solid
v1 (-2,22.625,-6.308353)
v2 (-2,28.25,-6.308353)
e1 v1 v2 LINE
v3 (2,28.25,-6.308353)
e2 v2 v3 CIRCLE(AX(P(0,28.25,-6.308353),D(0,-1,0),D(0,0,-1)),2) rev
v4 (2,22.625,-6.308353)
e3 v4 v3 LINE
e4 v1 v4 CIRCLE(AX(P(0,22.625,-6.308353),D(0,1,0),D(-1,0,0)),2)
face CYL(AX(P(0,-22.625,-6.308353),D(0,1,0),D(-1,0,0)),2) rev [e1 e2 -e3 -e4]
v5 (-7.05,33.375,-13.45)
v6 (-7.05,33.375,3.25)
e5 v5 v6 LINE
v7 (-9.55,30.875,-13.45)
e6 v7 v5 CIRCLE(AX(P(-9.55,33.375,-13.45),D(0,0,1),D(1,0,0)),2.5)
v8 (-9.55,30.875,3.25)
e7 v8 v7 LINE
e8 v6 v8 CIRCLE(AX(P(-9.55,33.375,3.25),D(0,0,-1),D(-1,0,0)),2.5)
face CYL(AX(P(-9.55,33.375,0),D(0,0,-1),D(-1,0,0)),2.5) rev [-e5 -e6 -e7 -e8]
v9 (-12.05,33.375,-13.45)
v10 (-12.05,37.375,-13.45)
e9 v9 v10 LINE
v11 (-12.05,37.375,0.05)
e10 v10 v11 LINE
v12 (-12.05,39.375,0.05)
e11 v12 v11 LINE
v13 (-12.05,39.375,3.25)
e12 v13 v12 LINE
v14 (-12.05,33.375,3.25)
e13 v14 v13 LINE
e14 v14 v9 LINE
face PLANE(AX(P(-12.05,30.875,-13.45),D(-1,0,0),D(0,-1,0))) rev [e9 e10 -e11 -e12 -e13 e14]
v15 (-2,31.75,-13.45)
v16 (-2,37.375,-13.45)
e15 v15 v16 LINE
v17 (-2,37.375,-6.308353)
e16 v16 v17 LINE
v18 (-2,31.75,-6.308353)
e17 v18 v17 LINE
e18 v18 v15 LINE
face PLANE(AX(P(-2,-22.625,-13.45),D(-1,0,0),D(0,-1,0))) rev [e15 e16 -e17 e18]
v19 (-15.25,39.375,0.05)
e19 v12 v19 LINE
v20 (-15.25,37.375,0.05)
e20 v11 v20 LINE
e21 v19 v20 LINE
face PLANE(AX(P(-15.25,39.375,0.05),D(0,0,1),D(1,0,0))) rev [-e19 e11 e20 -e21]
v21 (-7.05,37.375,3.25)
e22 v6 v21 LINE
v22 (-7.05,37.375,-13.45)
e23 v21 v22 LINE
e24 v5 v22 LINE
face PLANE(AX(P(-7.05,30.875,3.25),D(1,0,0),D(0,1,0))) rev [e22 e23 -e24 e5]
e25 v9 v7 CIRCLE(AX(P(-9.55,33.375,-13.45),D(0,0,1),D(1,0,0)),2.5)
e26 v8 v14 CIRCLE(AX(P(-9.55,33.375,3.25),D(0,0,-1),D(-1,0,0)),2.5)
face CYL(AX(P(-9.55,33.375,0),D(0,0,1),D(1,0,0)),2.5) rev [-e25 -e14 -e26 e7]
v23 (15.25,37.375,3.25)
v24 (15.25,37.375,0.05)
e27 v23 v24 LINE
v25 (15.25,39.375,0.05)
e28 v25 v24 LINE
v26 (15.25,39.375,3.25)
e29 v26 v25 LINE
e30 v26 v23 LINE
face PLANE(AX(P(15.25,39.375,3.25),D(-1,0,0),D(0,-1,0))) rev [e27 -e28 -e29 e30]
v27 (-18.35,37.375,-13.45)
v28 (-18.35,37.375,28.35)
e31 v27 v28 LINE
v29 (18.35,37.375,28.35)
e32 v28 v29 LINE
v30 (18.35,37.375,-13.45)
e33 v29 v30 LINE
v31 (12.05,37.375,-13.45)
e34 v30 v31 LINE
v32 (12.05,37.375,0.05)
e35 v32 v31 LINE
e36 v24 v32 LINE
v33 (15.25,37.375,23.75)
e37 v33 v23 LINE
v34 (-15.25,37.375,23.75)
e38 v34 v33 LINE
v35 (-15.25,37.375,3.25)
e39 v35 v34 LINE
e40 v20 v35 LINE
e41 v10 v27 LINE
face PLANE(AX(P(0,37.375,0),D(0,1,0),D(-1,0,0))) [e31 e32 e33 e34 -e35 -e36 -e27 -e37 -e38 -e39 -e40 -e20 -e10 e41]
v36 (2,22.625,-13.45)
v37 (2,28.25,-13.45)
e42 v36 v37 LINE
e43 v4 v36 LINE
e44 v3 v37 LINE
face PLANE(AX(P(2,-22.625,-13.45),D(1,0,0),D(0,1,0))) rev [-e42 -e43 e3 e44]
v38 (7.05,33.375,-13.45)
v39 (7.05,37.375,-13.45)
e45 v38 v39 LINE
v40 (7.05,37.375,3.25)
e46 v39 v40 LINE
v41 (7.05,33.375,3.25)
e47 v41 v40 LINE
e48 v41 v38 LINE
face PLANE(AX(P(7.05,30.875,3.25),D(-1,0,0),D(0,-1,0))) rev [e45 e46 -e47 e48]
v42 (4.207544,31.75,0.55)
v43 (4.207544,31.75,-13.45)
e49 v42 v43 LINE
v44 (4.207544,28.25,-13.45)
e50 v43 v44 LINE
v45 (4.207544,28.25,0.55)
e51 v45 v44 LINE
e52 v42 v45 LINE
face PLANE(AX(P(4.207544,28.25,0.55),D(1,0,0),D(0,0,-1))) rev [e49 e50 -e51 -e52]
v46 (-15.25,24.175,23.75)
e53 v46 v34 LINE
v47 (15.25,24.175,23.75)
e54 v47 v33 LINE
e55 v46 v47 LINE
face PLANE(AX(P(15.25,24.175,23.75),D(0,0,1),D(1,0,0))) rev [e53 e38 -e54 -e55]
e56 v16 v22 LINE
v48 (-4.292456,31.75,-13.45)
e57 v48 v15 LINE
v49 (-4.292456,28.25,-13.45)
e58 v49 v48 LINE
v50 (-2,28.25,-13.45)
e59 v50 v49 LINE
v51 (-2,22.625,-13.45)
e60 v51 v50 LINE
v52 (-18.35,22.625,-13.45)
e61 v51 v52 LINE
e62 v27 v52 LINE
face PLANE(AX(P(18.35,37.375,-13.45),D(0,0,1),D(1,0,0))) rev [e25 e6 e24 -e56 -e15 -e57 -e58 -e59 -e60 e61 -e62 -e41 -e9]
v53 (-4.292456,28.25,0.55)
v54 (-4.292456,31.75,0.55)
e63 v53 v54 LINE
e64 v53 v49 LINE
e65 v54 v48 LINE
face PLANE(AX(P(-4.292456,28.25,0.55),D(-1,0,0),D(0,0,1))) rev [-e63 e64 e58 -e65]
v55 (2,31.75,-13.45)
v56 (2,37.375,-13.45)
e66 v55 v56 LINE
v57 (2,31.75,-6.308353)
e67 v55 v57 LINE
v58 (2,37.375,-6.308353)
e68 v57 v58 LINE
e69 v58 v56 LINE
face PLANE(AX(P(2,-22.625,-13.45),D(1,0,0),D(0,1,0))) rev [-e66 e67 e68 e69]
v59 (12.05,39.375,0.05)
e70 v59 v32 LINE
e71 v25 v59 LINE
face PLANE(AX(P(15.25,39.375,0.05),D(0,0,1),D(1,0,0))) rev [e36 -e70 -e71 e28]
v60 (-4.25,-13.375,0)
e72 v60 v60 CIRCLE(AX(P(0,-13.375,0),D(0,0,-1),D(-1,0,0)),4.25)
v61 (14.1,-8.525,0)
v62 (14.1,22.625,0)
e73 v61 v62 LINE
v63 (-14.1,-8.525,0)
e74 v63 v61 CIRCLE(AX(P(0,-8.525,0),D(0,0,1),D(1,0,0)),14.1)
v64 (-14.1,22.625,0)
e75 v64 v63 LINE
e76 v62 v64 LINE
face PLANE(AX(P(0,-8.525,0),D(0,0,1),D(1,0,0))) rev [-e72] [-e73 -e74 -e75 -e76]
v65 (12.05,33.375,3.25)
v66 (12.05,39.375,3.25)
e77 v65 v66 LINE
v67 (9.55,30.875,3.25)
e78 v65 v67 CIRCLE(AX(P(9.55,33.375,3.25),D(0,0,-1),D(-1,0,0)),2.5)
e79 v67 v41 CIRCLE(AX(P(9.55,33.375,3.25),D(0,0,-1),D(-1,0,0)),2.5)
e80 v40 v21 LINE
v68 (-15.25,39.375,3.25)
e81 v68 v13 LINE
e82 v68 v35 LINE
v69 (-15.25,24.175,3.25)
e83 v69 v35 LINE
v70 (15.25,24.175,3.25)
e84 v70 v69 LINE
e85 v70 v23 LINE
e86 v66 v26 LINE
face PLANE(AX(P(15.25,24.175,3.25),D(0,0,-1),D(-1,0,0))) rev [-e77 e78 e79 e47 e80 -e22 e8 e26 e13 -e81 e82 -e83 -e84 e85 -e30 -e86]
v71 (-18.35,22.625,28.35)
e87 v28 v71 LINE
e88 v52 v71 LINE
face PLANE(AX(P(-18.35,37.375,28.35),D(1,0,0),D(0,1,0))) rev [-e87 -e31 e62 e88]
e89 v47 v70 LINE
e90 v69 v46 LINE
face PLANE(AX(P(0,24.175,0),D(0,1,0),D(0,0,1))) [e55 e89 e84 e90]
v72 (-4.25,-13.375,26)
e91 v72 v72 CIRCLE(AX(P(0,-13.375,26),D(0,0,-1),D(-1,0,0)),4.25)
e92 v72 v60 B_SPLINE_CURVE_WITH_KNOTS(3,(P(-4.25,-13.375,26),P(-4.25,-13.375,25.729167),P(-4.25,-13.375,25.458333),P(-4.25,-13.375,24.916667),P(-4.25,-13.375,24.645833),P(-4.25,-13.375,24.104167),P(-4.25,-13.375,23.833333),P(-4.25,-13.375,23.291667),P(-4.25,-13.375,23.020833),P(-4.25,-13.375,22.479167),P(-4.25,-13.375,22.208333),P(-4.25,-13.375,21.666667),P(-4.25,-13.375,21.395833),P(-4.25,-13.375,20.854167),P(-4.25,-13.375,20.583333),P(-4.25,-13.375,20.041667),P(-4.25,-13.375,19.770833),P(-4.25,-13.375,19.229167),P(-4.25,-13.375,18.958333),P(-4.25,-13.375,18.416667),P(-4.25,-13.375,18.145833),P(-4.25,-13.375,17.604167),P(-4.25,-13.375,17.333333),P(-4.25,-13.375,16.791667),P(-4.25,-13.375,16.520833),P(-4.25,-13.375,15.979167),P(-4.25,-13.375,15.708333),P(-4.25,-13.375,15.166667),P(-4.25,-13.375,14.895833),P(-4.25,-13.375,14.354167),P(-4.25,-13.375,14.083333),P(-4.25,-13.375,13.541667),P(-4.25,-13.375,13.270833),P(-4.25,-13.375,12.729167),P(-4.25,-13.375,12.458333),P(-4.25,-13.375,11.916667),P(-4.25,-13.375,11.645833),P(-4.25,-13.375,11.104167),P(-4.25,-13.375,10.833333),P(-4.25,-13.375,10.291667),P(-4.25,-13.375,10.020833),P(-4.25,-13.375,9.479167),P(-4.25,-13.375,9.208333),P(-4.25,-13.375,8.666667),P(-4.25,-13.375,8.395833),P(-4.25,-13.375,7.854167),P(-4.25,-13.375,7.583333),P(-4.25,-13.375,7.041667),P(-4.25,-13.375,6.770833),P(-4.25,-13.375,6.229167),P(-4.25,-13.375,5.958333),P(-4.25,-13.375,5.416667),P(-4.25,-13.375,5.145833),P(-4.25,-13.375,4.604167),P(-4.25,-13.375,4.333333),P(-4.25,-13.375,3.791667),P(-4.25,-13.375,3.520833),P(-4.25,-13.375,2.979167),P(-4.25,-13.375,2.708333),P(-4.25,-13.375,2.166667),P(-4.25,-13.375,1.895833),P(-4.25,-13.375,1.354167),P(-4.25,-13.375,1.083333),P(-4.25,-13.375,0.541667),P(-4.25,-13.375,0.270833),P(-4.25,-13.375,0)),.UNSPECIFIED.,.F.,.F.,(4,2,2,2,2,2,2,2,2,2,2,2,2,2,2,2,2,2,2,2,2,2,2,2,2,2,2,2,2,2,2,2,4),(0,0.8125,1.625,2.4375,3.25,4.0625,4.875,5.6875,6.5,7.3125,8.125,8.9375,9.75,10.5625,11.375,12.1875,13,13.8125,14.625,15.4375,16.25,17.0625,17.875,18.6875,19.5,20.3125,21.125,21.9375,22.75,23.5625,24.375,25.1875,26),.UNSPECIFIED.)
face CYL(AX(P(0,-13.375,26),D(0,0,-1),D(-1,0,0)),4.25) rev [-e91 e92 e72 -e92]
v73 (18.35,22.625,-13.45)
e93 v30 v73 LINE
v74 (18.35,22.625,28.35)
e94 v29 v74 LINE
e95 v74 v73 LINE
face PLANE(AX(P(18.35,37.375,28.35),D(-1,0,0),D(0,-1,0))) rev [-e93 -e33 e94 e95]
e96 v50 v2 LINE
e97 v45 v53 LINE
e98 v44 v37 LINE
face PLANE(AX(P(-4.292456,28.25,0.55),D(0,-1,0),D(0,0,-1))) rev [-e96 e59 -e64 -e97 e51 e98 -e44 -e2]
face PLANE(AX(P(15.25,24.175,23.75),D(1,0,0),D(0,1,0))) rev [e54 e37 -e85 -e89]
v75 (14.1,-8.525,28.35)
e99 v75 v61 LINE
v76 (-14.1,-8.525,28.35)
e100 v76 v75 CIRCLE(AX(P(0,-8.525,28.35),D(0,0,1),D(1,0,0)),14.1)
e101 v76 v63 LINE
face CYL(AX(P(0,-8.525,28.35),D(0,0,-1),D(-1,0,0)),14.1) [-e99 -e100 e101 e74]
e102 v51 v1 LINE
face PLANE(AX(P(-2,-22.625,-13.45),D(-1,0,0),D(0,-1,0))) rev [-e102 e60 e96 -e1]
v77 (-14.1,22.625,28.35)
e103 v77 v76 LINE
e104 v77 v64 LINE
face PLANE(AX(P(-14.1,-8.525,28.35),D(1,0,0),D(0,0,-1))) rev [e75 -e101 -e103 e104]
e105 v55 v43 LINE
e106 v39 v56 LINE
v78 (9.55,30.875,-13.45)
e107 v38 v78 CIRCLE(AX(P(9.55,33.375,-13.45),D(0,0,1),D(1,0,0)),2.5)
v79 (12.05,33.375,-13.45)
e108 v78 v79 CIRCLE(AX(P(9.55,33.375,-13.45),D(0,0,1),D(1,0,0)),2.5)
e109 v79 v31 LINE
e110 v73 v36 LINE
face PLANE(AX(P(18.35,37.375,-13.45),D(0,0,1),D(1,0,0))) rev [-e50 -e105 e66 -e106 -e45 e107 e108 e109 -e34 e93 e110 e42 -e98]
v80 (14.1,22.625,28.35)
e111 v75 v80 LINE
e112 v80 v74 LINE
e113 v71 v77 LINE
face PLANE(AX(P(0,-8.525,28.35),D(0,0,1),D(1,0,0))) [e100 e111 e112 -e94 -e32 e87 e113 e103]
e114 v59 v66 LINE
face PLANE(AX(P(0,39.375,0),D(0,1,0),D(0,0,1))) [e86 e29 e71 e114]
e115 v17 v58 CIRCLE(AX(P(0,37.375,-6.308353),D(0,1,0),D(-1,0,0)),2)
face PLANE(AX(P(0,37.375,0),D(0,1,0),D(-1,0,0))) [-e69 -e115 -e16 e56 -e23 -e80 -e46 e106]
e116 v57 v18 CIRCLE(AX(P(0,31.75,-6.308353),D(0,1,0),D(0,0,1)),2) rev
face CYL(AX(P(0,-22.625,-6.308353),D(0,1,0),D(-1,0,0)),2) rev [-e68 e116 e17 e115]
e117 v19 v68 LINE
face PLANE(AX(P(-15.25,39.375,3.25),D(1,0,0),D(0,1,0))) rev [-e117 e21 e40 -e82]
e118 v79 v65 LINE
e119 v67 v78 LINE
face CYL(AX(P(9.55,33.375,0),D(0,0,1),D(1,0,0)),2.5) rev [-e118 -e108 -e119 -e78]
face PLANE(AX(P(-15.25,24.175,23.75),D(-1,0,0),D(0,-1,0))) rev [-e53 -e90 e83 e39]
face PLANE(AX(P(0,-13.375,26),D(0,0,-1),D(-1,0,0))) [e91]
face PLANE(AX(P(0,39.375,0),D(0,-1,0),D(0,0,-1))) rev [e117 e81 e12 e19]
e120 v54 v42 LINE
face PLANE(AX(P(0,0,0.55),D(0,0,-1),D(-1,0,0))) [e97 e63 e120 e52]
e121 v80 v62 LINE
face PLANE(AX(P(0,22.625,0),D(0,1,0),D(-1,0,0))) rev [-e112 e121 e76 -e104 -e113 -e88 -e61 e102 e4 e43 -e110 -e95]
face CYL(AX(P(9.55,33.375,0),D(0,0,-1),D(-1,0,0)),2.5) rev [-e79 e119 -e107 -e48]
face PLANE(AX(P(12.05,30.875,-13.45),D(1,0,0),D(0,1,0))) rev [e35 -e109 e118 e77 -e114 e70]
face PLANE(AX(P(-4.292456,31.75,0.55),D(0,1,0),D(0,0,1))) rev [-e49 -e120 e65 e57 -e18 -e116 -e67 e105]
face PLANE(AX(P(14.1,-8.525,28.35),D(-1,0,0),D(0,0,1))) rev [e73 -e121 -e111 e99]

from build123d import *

# Parameters (mm, degrees)
RESSALTO_EXTRUS_O1_DEPTH = 28.35
ESBO_O2_R                = 4.25
CORTE_EXTRUS_O1_DEPTH    = 26
ESBO_O3_W                = 36.7
ESBO_O3_H                = 41.8
RESSALTO_EXTRUS_O2_DEPTH = 14.75
ESBO_O5_W                = 30.5
ESBO_O5_H                = 20.5
CORTE_EXTRUS_O2_DEPTH    = 13.2
CORTE_EXTRUS_O3_DEPTH    = 69.850889609
ESBO_O7_W                = 5
ESBO_O7_H                = 16.7
CORTE_EXTRUS_O4_DEPTH    = 6.5
FILETE1_R                = 2.5
ESBO_O8_W                = 8.5
ESBO_O8_H                = 3.5
CORTE_EXTRUS_O5_DEPTH    = 14
ESBO_O9_W                = 3.2
ESBO_O9_H                = 3.2
RESSALTO_EXTRUS_O3_DEPTH = 2


with BuildPart() as part:
    # Esboço1 → Ressalto-extrusão1 (new body)
    with BuildSketch(Plane.XY):
        with BuildLine():
            Line((14.1, -8.525), (14.1, 22.625))
            Line((14.1, 22.625), (-14.1, 22.625))
            Line((-14.1, 22.625), (-14.1, -8.525))
            ThreePointArc((-14.1, -8.525), (0, -22.625), (14.1, -8.525))
        make_face()
    extrude(amount=RESSALTO_EXTRUS_O1_DEPTH)

    # Esboço2 → Corte-extrusão1 (cut)
    with BuildSketch(Plane(origin=(0, 0, 0), x_dir=(-1, 0, 0), z_dir=(0, 0, -1))):
        with Locations((0, -13.375)):
            Circle(ESBO_O2_R)
    extrude(amount=-CORTE_EXTRUS_O1_DEPTH, mode=Mode.SUBTRACT)

    # Esboço3 → Ressalto-extrusão2 (add)
    with BuildSketch(Plane(origin=(0, 22.625, 0), x_dir=(1, 0, 0), z_dir=(0, 1, 0))):
        with Locations((0, -7.45)):
            Rectangle(ESBO_O3_W, ESBO_O3_H)
    extrude(amount=RESSALTO_EXTRUS_O2_DEPTH)

    # Esboço5 → Corte-extrusão2 (cut)
    with BuildSketch(Plane(origin=(0, 37.375, 0), x_dir=(1, 0, 0), z_dir=(0, 1, 0))):
        with Locations((0, -13.5)):
            Rectangle(ESBO_O5_W, ESBO_O5_H)
    extrude(amount=-CORTE_EXTRUS_O2_DEPTH, mode=Mode.SUBTRACT)

    # Esboço6 → Corte-extrusão3 (cut, through all)
    with BuildSketch(Plane(origin=(0, 37.375, 0), x_dir=(1, 0, 0), z_dir=(0, 1, 0))):
        with BuildLine():
            Line((-2, 13.45), (-2, 6.30835312))
            ThreePointArc((-2, 6.30835312), (0, 4.30835312), (2, 6.30835312))
            Line((2, 6.30835312), (2, 13.45))
            Line((2, 13.45), (-2, 13.45))
        make_face()
    extrude(amount=-CORTE_EXTRUS_O3_DEPTH, mode=Mode.SUBTRACT)

    # Esboço7 → Corte-extrusão4 (cut)
    with BuildSketch(Plane(origin=(0, 37.375, 0), x_dir=(1, 0, 0), z_dir=(0, 1, 0))):
        with Locations((-9.55, 5.1)):
            Rectangle(ESBO_O7_W, ESBO_O7_H)
        with Locations((9.55, 5.1)):
            Rectangle(ESBO_O7_W, ESBO_O7_H)
    extrude(amount=-CORTE_EXTRUS_O4_DEPTH, mode=Mode.SUBTRACT)

    # Filete1
    filete1_edges = [part.edges().sort_by_distance(p)[0] for p in [
        (-12.05, 30.875, -5.1),
        (-7.05, 30.875, -5.1),
        (7.05, 30.875, -5.1),
        (12.05, 30.875, -5.1),
    ]]
    fillet(filete1_edges, radius=FILETE1_R - 0.0001)  # a hair under: the kernel refuses the full size

    # Esboço8 → Corte-extrusão5 (cut)
    with BuildSketch(Plane(origin=(0, 0, -13.45), x_dir=(-1, 0, 0), z_dir=(0, 0, -1))):
        with Locations((0.04245602, 30)):
            Rectangle(ESBO_O8_W, ESBO_O8_H)
    extrude(amount=-CORTE_EXTRUS_O5_DEPTH, mode=Mode.SUBTRACT)

    # Esboço9 → Ressalto-extrusão3 (add)
    with BuildSketch(Plane(origin=(0, 37.375, 0), x_dir=(1, 0, 0), z_dir=(0, 1, 0))):
        with Locations((-13.65, -1.65)):
            Rectangle(ESBO_O9_W, ESBO_O9_H)
        with Locations((13.65, -1.65)):
            Rectangle(ESBO_O9_W, ESBO_O9_H)
    extrude(amount=RESSALTO_EXTRUS_O3_DEPTH)


solid = part.part
